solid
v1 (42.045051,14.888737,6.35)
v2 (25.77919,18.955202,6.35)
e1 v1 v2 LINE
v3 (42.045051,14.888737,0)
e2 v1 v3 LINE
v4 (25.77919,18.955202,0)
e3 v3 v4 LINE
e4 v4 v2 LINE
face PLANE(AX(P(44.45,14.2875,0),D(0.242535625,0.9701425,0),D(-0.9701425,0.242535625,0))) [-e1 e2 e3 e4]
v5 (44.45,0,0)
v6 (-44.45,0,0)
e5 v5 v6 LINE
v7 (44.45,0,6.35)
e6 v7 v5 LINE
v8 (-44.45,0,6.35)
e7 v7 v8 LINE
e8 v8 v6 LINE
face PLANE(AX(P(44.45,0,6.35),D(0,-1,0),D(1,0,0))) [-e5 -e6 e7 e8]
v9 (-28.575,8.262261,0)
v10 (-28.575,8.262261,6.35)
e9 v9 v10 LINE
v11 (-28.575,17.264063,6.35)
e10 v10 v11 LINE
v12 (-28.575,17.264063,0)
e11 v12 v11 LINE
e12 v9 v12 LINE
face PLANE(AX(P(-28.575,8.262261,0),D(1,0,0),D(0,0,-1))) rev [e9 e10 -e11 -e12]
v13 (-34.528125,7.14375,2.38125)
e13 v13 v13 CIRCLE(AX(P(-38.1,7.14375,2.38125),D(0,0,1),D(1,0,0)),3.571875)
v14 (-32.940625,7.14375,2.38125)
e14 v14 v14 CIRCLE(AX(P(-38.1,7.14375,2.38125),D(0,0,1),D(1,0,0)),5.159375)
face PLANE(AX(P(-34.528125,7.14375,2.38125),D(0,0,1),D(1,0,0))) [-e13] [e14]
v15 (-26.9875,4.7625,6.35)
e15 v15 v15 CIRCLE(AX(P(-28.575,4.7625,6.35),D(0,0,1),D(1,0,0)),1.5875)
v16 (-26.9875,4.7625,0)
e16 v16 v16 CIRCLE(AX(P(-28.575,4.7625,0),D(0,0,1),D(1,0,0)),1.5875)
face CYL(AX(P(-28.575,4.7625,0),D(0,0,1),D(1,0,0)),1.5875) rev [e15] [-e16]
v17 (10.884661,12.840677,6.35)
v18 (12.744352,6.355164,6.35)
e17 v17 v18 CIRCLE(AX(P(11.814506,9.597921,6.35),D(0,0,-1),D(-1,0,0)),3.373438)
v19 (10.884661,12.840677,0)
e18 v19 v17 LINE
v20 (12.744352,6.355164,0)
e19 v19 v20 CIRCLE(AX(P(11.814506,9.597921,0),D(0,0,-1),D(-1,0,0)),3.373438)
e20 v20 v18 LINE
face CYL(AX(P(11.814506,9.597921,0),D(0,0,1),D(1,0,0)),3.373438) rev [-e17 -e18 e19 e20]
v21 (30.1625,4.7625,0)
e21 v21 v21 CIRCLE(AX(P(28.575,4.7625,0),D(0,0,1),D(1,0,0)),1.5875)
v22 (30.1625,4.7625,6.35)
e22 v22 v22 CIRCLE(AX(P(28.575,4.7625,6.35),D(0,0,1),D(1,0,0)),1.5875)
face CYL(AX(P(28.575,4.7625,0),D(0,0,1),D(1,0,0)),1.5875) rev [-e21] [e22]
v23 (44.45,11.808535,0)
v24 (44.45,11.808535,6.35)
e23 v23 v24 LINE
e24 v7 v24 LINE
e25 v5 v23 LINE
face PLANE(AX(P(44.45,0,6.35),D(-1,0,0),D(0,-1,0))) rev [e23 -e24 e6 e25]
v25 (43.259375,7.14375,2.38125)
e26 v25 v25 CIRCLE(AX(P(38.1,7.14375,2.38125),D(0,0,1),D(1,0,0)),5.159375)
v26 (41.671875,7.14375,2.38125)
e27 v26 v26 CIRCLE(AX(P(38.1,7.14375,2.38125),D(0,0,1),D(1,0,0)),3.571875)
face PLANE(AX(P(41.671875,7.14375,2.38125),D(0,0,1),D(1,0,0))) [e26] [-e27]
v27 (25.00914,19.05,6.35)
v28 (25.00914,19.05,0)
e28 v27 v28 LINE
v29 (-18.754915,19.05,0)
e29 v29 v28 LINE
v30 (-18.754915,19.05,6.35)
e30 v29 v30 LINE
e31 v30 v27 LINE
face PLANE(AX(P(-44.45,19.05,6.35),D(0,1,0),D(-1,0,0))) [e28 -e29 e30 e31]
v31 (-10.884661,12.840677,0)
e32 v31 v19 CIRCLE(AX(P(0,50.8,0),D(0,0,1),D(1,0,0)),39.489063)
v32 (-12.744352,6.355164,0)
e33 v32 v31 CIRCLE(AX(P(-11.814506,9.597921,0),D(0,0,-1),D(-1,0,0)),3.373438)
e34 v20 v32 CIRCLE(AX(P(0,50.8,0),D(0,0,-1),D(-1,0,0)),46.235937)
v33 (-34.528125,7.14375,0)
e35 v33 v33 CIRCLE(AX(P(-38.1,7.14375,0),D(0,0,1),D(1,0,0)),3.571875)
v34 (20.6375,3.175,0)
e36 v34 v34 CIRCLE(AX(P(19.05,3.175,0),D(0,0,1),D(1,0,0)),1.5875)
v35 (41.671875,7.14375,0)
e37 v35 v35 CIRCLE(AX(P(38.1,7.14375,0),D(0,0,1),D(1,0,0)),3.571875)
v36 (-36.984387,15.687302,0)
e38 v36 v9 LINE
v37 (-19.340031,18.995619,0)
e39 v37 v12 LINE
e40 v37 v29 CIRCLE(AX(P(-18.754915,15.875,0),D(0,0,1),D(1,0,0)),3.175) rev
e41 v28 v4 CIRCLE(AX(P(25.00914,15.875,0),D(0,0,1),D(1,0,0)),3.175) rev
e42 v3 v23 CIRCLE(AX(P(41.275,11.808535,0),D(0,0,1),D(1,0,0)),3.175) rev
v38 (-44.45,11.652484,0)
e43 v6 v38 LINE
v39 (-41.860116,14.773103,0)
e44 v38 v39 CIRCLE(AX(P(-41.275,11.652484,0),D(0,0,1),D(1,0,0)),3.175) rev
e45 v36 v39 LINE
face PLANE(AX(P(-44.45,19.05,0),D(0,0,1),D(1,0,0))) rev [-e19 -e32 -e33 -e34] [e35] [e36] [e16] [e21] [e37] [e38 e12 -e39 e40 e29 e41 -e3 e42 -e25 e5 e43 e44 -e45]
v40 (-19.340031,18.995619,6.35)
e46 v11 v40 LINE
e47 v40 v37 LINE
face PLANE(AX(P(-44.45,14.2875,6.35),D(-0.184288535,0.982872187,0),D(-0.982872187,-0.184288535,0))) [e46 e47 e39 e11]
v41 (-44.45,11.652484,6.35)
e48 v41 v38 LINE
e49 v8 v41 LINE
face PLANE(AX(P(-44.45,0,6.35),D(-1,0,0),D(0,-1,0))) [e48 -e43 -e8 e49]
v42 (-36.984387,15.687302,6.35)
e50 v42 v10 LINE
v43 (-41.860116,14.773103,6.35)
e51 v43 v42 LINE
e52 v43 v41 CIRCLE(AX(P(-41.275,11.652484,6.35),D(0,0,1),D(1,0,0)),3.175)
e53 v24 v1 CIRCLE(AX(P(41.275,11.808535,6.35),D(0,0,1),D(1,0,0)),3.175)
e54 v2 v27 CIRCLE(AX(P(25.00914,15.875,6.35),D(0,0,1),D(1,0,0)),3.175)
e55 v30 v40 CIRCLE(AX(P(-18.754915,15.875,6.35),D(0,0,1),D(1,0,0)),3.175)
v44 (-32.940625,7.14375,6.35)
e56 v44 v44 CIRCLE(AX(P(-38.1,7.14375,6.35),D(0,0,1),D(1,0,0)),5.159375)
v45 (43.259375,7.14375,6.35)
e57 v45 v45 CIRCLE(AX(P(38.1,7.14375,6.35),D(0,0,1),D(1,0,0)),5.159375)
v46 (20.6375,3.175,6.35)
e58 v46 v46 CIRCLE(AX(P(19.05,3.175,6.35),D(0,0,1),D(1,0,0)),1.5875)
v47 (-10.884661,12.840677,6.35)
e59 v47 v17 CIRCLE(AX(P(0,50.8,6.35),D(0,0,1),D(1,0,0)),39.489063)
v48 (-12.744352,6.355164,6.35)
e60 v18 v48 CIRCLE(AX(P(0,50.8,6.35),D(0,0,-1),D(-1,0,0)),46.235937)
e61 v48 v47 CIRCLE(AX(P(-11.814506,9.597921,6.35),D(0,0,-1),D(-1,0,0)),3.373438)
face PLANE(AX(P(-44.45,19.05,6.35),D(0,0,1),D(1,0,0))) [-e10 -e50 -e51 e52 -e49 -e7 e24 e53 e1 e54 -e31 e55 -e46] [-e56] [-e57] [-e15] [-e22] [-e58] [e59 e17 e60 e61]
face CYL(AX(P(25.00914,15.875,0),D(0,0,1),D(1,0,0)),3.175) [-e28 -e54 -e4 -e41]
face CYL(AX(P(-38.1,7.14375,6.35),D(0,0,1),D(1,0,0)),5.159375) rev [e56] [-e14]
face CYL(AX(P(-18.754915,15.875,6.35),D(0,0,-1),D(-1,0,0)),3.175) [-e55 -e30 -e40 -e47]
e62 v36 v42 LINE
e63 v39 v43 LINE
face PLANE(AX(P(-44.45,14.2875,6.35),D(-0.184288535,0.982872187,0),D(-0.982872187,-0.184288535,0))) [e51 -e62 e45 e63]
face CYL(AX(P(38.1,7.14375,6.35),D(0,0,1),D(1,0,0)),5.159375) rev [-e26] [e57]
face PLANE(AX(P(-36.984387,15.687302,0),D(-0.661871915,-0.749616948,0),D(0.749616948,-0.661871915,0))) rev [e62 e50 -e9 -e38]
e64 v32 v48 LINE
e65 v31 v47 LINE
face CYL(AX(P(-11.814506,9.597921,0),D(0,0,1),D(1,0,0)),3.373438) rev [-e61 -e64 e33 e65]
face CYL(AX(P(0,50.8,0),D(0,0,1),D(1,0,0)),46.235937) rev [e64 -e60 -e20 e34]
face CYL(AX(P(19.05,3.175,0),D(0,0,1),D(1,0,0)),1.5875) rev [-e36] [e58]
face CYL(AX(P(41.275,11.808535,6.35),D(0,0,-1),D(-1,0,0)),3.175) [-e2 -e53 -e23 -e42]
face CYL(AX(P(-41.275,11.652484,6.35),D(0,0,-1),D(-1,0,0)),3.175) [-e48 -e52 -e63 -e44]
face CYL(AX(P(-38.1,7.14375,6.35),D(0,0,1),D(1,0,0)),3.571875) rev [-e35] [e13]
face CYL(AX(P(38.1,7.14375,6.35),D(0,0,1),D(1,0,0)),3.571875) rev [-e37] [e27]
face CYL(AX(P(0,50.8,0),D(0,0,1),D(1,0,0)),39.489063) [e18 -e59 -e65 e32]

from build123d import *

# Parameters (mm, degrees)
SKETCH1_W          = 88.9
SKETCH1_H          = 19.05
BASE_EXTRUDE_DEPTH = 6.35
CUT_EXTRUDE1_DEPTH = 49.775275499
CUT_EXTRUDE3_DEPTH = 49.775275499
CUT_EXTRUDE4_DEPTH = 49.775275499
CUT_EXTRUDE5_DEPTH = 49.775275499
FILLET1_R          = 3.175
HOLE1_D            = 7.14375
HOLE1_CBORE_D      = 10.31875
HOLE1_CBORE_DEPTH  = 3.96875
LPATTERN1_COUNT    = 2
LPATTERN1_PITCH    = 76.2
HOLE2_OUTLINE_R    = 1.5875
HOLE2_DEPTH        = 6.35
HOLE3_OUTLINE_R    = 1.5875
HOLE3_DEPTH        = 6.35
LPATTERN2_COUNT    = 2
LPATTERN2_PITCH    = 57.15


# Read off the part's stored shape, not the designer's step: Hole2, Hole3
with BuildPart() as part:
    # Sketch1 → Base-Extrude (new body)
    with BuildSketch(Plane.XY):
        with Locations((0, 9.525)):
            Rectangle(SKETCH1_W, SKETCH1_H)
    extrude(amount=BASE_EXTRUDE_DEPTH)

    # Sketch2 → Cut-Extrude1 (cut, through all)
    with BuildSketch(Plane.XY.offset(6.35)):
        Polygon((44.45, 14.2875), (25.4, 19.05), (44.45, 19.05), align=None)
    extrude(amount=-CUT_EXTRUDE1_DEPTH, mode=Mode.SUBTRACT)

    # Sketch4 → Cut-Extrude3 (cut, through all)
    with BuildSketch(Plane.XY.offset(6.35)):
        Polygon((-231.275885049, -20.742353447), (-44.45, 14.2875), (-19.05, 19.05), (167.775885049, 54.079853447), (97.716178156, 427.731623544), (-301.335591942, 352.909416651), align=None)
    extrude(amount=-CUT_EXTRUDE3_DEPTH, mode=Mode.SUBTRACT)

    # Sketch5 → Cut-Extrude4 (cut, through all)
    with BuildSketch(Plane.XY.offset(6.35)):
        Polygon((-36.984386732, 15.687302488), (-28.575, 8.262261056), (-28.575, 17.2640625), align=None)
    extrude(amount=-CUT_EXTRUDE4_DEPTH, mode=Mode.SUBTRACT)

    # Sketch6 → Cut-Extrude5 (cut, through all)
    with BuildSketch(Plane.XY.offset(6.35)):
        with BuildLine():
            ThreePointArc((-10.884660771, 12.84067681), (0, 11.3109375), (10.884660771, 12.84067681))
            ThreePointArc((10.884660771, 12.84067681), (15.057262416, 10.52776595), (12.744351556, 6.355164305))
            ThreePointArc((12.744351556, 6.355164305), (0, 4.5640625), (-12.744351556, 6.355164305))
            ThreePointArc((-12.744351556, 6.355164305), (-15.057262416, 10.52776595), (-10.884660771, 12.84067681))
        make_face()
    extrude(amount=-CUT_EXTRUDE5_DEPTH, mode=Mode.SUBTRACT)

    # Fillet1
    fillet1_edges = [part.edges().sort_by_distance(p)[0] for p in [
        (44.45, 14.2875, 3.175),
        (25.4, 19.05, 3.175),
        (-19.05, 19.05, 3.175),
        (-44.45, 14.2875, 3.175),
    ]]
    fillet(fillet1_edges, radius=FILLET1_R)

    # Hole1 (through all)
    with Locations(Plane.XY.offset(6.35)):
        with Locations((38.1, 7.14375)):
            hole1 = CounterBoreHole(HOLE1_D / 2, HOLE1_CBORE_D / 2, HOLE1_CBORE_DEPTH)

    # LPattern1: Hole1 ×2
    with Locations(*[(-i * LPATTERN1_PITCH, 0, 0) for i in range(1, LPATTERN1_COUNT)]):
        add(hole1, mode=Mode.SUBTRACT)

    # Hole2 outline → Hole2 (cut)
    with BuildSketch(Plane.XY):
        with Locations((28.575, 4.7625)):
            Circle(HOLE2_OUTLINE_R)
    hole2 = extrude(amount=HOLE2_DEPTH, mode=Mode.SUBTRACT)

    # Hole3 outline → Hole3 (cut)
    with BuildSketch(Plane.XY):
        with Locations((19.05, 3.175)):
            Circle(HOLE3_OUTLINE_R)
    extrude(amount=HOLE3_DEPTH, mode=Mode.SUBTRACT)

    # LPattern2: Hole2 ×2
    with Locations(*[(-i * LPATTERN2_PITCH, 0, 0) for i in range(1, LPATTERN2_COUNT)]):
        add(hole2, mode=Mode.SUBTRACT)


solid = part.part
